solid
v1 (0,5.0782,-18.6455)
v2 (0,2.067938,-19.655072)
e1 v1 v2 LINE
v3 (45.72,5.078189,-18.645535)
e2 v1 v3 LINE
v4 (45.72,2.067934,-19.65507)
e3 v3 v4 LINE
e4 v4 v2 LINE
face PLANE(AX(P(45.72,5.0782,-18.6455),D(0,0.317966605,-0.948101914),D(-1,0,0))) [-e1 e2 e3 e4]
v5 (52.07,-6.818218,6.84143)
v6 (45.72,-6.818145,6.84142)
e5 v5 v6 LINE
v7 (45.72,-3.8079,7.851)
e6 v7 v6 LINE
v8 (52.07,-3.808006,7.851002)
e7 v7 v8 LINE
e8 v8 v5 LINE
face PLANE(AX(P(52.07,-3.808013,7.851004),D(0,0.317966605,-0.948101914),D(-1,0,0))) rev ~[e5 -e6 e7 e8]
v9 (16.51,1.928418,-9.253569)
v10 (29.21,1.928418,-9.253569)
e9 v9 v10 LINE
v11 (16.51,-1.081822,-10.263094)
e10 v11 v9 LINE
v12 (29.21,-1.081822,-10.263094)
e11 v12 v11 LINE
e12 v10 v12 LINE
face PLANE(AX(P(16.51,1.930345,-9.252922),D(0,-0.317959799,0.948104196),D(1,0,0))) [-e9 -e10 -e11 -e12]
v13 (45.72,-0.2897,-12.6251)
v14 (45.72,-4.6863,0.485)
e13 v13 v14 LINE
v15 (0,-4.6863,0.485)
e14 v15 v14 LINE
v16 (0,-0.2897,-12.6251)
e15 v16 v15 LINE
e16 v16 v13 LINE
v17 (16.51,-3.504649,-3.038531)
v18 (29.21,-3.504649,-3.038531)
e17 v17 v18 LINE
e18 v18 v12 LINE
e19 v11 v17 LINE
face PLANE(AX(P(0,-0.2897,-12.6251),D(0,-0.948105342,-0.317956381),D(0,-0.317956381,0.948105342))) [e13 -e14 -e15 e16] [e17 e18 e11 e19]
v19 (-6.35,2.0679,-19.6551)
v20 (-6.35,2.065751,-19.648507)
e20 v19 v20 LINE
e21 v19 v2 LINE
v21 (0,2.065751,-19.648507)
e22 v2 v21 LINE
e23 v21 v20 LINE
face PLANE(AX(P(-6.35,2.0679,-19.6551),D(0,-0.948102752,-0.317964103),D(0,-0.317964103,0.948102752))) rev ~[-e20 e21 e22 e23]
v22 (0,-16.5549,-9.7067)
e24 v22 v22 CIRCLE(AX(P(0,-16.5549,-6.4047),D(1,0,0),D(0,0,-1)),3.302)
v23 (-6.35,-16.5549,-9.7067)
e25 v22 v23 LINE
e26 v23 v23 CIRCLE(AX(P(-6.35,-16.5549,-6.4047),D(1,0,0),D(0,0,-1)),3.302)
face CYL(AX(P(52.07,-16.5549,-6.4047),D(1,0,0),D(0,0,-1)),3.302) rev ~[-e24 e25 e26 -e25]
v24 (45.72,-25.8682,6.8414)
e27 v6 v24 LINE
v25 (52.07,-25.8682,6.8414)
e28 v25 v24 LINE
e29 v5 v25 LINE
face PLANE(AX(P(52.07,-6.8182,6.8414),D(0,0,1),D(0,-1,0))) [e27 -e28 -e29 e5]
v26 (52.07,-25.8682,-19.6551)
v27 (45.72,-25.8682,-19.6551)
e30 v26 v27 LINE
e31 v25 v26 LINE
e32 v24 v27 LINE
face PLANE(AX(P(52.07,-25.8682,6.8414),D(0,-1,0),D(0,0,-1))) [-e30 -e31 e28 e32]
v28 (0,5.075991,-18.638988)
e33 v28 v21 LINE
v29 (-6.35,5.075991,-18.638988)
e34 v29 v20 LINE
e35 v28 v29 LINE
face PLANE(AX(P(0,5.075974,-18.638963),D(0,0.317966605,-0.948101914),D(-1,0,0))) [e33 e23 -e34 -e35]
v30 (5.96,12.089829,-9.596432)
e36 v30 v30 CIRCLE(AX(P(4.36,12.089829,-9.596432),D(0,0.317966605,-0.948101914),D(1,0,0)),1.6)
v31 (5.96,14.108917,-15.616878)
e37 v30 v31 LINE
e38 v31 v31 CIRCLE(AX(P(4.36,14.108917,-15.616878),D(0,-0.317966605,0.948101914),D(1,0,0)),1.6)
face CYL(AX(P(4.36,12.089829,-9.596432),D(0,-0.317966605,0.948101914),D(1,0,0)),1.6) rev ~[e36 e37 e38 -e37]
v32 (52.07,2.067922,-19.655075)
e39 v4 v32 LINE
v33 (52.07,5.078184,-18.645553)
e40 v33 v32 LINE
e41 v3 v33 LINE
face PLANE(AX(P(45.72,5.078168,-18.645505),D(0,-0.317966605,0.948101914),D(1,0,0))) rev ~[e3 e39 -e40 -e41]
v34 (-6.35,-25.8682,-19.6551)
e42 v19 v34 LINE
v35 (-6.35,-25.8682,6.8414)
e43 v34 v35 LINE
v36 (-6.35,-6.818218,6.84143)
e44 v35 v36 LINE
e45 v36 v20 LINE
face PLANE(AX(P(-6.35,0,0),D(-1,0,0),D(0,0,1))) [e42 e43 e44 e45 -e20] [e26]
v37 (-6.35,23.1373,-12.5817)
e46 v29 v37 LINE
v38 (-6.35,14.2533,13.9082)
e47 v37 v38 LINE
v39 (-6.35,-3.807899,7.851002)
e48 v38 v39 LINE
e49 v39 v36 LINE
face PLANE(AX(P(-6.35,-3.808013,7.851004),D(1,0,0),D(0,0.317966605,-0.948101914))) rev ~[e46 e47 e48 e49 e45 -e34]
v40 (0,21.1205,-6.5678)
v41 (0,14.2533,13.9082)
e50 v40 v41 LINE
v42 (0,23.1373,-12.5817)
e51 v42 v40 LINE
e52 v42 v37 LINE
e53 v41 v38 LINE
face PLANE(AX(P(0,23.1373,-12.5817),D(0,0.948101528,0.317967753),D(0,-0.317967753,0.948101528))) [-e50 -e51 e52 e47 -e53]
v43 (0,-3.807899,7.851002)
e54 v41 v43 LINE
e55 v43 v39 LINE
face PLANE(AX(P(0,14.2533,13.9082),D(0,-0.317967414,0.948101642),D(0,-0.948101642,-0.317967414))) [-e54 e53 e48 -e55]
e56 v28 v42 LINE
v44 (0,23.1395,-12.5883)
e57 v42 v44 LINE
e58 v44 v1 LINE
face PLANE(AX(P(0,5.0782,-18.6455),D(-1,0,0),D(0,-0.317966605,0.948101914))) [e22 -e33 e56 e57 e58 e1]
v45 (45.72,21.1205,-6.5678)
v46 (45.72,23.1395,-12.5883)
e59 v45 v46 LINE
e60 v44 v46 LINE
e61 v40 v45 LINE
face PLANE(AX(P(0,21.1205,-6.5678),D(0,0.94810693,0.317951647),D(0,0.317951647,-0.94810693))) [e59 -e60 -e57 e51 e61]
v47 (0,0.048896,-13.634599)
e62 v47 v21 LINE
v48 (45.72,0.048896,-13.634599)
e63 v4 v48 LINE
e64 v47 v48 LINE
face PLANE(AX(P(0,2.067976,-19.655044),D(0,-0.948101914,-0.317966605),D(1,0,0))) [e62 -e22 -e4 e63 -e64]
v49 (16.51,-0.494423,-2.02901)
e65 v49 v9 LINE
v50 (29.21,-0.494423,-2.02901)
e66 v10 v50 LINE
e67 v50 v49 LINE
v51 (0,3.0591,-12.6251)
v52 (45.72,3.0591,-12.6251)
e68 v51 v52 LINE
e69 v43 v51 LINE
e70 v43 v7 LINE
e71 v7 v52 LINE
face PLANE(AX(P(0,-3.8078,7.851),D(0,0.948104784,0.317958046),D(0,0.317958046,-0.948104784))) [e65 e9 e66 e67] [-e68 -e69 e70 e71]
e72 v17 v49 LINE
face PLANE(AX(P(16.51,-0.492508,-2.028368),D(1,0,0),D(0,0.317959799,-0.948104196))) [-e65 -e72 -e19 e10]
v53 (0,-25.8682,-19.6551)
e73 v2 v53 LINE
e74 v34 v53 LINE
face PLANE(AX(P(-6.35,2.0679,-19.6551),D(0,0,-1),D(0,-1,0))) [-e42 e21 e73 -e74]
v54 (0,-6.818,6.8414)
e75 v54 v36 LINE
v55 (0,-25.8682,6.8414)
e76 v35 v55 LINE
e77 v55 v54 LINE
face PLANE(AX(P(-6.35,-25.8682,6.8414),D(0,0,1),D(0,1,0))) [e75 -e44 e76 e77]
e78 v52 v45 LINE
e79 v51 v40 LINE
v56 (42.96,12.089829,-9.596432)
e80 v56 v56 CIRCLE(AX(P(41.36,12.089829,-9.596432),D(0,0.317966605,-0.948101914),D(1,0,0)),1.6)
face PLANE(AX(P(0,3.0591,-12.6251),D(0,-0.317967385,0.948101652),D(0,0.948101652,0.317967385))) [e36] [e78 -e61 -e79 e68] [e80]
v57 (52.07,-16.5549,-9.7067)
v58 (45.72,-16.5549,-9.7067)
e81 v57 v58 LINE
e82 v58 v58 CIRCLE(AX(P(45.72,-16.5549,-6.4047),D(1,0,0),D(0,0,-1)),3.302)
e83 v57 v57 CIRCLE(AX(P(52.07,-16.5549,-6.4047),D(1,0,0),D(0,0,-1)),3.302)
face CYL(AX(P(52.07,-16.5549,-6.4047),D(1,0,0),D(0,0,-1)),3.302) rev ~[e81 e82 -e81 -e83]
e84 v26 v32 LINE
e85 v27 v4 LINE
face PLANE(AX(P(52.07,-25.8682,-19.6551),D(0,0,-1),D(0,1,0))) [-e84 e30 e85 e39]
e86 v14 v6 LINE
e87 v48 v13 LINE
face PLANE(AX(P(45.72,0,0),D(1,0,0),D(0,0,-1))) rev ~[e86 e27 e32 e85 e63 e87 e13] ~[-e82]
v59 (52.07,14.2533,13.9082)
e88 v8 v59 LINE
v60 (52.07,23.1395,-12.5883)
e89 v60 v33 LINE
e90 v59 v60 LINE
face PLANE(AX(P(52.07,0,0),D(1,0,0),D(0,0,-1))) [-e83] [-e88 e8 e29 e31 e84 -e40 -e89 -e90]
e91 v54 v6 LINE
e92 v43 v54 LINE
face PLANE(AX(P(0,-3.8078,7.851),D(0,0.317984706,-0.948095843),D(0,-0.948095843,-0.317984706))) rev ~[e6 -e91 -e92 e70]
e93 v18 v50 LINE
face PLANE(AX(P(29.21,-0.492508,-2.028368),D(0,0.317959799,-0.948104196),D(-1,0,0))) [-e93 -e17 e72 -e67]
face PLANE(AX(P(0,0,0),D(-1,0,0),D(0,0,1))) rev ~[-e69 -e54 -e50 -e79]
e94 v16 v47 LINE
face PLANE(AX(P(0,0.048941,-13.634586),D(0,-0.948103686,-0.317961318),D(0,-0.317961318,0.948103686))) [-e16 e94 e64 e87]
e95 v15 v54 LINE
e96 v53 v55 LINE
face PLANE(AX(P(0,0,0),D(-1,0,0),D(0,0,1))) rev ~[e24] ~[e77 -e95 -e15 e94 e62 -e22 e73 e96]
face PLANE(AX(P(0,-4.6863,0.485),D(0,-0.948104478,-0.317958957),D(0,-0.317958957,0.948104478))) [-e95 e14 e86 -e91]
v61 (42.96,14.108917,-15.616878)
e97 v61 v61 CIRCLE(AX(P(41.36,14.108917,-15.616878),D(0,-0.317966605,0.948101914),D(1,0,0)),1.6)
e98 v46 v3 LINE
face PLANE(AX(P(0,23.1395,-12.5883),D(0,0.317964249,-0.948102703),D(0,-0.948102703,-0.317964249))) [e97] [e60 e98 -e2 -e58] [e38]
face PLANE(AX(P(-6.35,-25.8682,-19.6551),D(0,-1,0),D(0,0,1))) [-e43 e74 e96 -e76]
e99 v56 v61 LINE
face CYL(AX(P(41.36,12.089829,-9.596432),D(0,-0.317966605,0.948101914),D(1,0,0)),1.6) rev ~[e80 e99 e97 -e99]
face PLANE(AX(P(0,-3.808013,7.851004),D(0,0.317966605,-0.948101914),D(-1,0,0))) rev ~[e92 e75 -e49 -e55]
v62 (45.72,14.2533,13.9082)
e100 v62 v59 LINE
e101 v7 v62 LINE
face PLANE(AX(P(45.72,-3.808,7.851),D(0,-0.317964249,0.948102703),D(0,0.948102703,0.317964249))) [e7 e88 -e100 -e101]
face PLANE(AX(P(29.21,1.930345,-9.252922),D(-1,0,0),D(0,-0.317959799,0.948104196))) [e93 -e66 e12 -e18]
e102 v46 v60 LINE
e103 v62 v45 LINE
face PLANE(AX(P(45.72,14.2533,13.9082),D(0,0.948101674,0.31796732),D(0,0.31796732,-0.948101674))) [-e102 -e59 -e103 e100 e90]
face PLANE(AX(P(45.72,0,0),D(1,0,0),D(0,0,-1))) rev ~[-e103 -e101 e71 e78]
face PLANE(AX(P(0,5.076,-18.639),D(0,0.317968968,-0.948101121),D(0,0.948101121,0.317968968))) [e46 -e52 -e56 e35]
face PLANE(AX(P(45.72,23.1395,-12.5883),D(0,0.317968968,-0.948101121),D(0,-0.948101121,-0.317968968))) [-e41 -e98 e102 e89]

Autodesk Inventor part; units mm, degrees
ref_plane "YZ Plane" through (0, 0, 0) normal (1, 0, 0) x (0, 1, 0)
ref_plane "XZ Plane" through (0, 0, 0) normal (0, 1, 0) x (-1, 0, 0)
sketch "Sketch8" plane through (0, 0, 0) normal (1, 0, 0) x (0, 1, 0)
  line L0 (-3.8078, 7.851) -> (3.0591, -12.6251)
  line L1 (-0.2897, -12.6251) -> (-4.6863, 0.485)
  line L2 (3.0591, -12.6251) -> (-0.2897, -12.6251)
  line L3 (-4.6863, 0.485) -> (-6.818, 6.8414)
  line L4 (-3.8078, 7.851) -> (-6.818, 6.8414)
  point P0 (0, 0)
  dimension "d149" = 21.5968
  dimension "d150" = 3.175
  dimension "d151" = 3.3488
extrude "Extrusion6" add sketch "Sketch8" along normal blind 45.72
sketch "Sketch11" plane through (0, 0, 0) normal (-1, 0, 0) x (0, 0, 1)
  line L0 (0.485, -4.6863) -> (-12.6251, -0.2897) projected
  line L1 (6.8422, -6.8159) -> (6.835, -6.8159)
  line L2 (-12.6251, -0.2897) -> (0.485, -4.6863)
  line L3 (7.851, -3.8078) -> (-12.6251, 3.0591) projected
  line L4 (13.9082, 14.2533) -> (7.851, -3.808)
  line L5 (7.851, -3.808) -> (-18.639, 5.076)
  line L6 (-18.639, 5.076) -> (-12.5817, 23.1373)
  line L7 (-12.5817, 23.1373) -> (13.9082, 14.2533)
  line L8 (-12.6251, -0.2897) -> (6.8414, -6.818) projected
  line L9 (6.8414, -6.818) -> (7.851, -3.8078) projected
  point P0 (0, 0)
  dimension "d73" = 27.94
  dimension "d76" = 0
  dimension "d88" = 19.05
extrude "Extrusion8" add sketch "Sketch11" along normal blind 6.35 contours L3 L5 L6 L7 L4
sketch "Sketch13" plane through (0, -3.8078, 7.851) normal (0, 0.9481042, 0.3179598) x (1, 0, 0)
  line L0 (0, 0) -> (0, 21.5968) projected
  line L1 (16.51, 18.0408) -> (29.21, 18.0408)
  line L2 (29.21, 18.0408) -> (29.21, 10.4208)
  line L3 (29.21, 10.4208) -> (16.51, 10.4208)
  line L4 (16.51, 10.4208) -> (16.51, 18.0408)
  point P0 (0, 8.6543)
  dimension "d55" = 7.62
  dimension "d56" = 12.7
  dimension "d57" = 16.51
extrude "Extrusion10" cut sketch "Sketch13" against normal blind 25.4
sketch "Sketch15" plane through (0, 0, 0) normal (1, 0, 0) x (0, 0, -1)
  line L0 (6.5678, 21.1205) -> (12.5883, 23.1395)
  line L1 (12.5883, 23.1395) -> (18.6455, 5.0782)
  line L2 (18.6455, 5.0782) -> (12.6251, 3.0591)
  line L3 (12.6251, 3.0591) -> (6.5678, 21.1205)
  dimension "d67" = 6.35
  dimension "d69" = 0
  dimension "d70" = 0
  dimension "d87" = 19.05
extrude "Extrusion11" add sketch "Sketch15" along normal blind 45.72
sketch "Sketch17" plane through (45.72, 0, 0) normal (1, 0, 0) x (0, 0, -1)
  line L0 (-7.851, -3.808) -> (-13.9082, 14.2533) projected
  line L1 (-7.851, -3.808) -> (-13.9082, 14.2533)
  line L2 (-13.9082, 14.2533) -> (12.5883, 23.1395)
  line L3 (12.5883, 23.1395) -> (18.6456, 5.0782)
  line L4 (18.6456, 5.0782) -> (-7.851, -3.808)
  point P0 (0, 0)
extrude "Extrusion12" add sketch "Sketch17" along normal blind 6.35
sketch "Sketch19" plane through (45.72, 5.0782, -18.6456) normal (0, -0.9481019, -0.3179666) x (1, 0, 0)
  line L0 (0, 6.3501) -> (0, 0.0001) projected
  line L1 (6.35, 27.947) -> (0, 27.947)
  line L2 (0, 27.947) -> (0, 0.0001)
  line L3 (0, 0.0001) -> (6.35, 0.0001)
  line L4 (6.35, 0.0001) -> (6.35, 27.947)
  line L5 (-45.72, 6.3501) -> (0, 6.3501) projected
  line L6 (0, 0.0001) -> (0, 0.0001)
  line L7 (0, 0.0001) -> (0, 6.3501)
  line L8 (0, 6.3501) -> (0, 6.3501)
  line L9 (0, 6.3501) -> (0, 0.0001)
  line L10 (-45.72, 0.007) -> (-52.07, 0.007) projected
  line L11 (-52.07, 0.007) -> (-45.72, 0.007)
  line L12 (-45.72, 0.007) -> (-45.72, 27.947)
  line L13 (-45.72, 27.947) -> (-52.07, 27.947)
  line L14 (-52.07, 27.947) -> (-52.07, 0.007)
  point P0 (-45.72, 19.2926)
extrude "Extrusion13" add sketch "Sketch19" along normal blind 3.175
sketch "Sketch20" plane through (0, 5.0782, -18.6455) normal (0, -0.9481019, -0.3179666) x (1, 0, 0)
  line L0 (45.72, 0) -> (0, 0)
  line L1 (0, 0) -> (0, 6.35)
  line L2 (0, 6.35) -> (45.72, 6.35)
  line L3 (45.72, 6.35) -> (45.72, 0)
  point P0 (0, 19.2926)
extrude "Extrusion14" add sketch "Sketch20" along normal blind 3.175
sketch "Sketch21" plane through (0, 0, 0) normal (1, 0, 0) x (0, 0, -1)
  line L0 (19.6485, 2.0658) -> (13.6346, 0.0489) projected
  line L1 (13.6346, 0.0489) -> (12.6251, 3.0591) projected
  line L2 (12.6251, 3.0591) -> (12.6251, -0.2897) projected
  line L3 (12.6251, -0.2897) -> (-6.8414, -6.818) projected
  line L4 (-0.485, -4.6863) -> (-0.485, -4.6865) projected
  line L5 (19.6485, 2.0657) -> (-6.8414, -6.8182) projected
  line L6 (19.6485, 2.0657) -> (19.6485, 2.0658) projected
  line L7 (12.6251, 3.0591) -> (13.6346, 0.0489)
  line L8 (12.6251, -0.2897) -> (13.6346, 0.0489)
  line L9 (12.6251, 3.0591) -> (12.6251, -0.2897)
  point P0 (0, 0)
  point P1 (-6.8415, -6.8181)
extrude "Extrusion15" add sketch "Sketch21" along normal blind 45.72
sketch "Sketch22" plane through (16.51, -1.0818, -10.2631) normal (0, 0.9481042, 0.3179598) x (1, 0, 0)
  line L0 (12.7, -7.62) -> (12.7, 0) projected
  line L1 (12.7, 0) -> (0, 0) projected
  line L2 (0, 0) -> (12.7, 0)
  line L3 (12.7, 0) -> (12.7, -7.62)
  line L4 (12.7, -7.62) -> (0, -7.62)
  line L5 (0, -7.62) -> (0, 0)
  point P0 (-16.51, -9.3866)
extrude "Extrusion16" cut sketch "Sketch22" against normal blind 45.72
ref_plane "Work Plane1" through (0, -6.818, 6.8414) normal (0, -1, 0) x (1, 0, 0)
sketch "Sketch31" plane through (0, 21.1205, -6.5678) normal (0, -0.3179666, 0.9481019) x (1, 0, 0)
  line L0 (0, -19.05) -> (45.72, -19.05) projected
  line L1 (8.11, -16.025) -> (37.61, -16.025)
  line L2 (37.61, -16.025) -> (37.61, -13.275)
  line L3 (37.61, -13.275) -> (41.36, -13.275)
  arc A0 (41.36, -13.275) -> (41.36, -5.775) centre (41.36, -9.525) ccw
  line L4 (41.36, -5.775) -> (37.61, -5.775)
  line L5 (37.61, -5.775) -> (37.61, -3.025)
  line L6 (37.61, -3.025) -> (8.11, -3.025)
  line L7 (8.11, -3.025) -> (8.11, -5.775)
  line L8 (8.11, -5.775) -> (4.36, -5.775)
  arc A1 (4.36, -5.775) -> (4.36, -13.275) centre (4.36, -9.525) ccw
  line L9 (4.36, -13.275) -> (8.11, -13.275)
  line L10 (8.11, -13.275) -> (8.11, -16.025)
  circle A2 centre (41.36, -9.525) radius 1.6
  circle A3 centre (4.36, -9.525) radius 1.6
  line L11 (22.86, -3.025) -> (22.86, -16.025)
  line L12 (0, 0) -> (45.72, 0) projected
  line L13 (22.86, 0) -> (22.86, -19.05)
  line L14 (4.36, -9.525) -> (41.36, -9.525)
  line L15 (0, -22.225) -> (0, 0) projected
  line L16 (45.72, -19.05) -> (45.72, 0) projected
  line L17 (0, -9.525) -> (45.72, -9.525)
  point P0 (0, -17.936)
  point P1 (22.86, -9.525)
  point P2 (22.86, -9.525)
  dimension "d132" = 9.525
extrude "Extrusion24" cut sketch "Sketch31" against normal through all contours L17 L14 A3 | A3 L14 L17 | L14 L17 A2 | A2 L17 L14
sketch "Sketch32" plane through (52.07, 0, 0) normal (1, 0, 0) x (0, 0, -1)
  line L0 (19.6551, 2.0679) -> (-6.8414, -6.8182) projected
  line L1 (-6.8414, -6.8182) -> (-6.8414, -25.8682)
  line L2 (-6.8414, -25.8682) -> (19.6551, -25.8682)
  line L3 (19.6551, -25.8682) -> (19.6551, 2.0679)
  point P0 (0, 0)
  dimension "d139" = 19.05
extrude "Extrusion25" add sketch "Sketch32" against normal up to surface (6.35 mm away)
sketch "Sketch33" plane through (-6.35, 0, 0) normal (-1, 0, 0) x (0, 0, 1)
  line L0 (6.8414, -25.8682) -> (6.8414, -6.8182) projected
  line L1 (-19.6551, -25.8682) -> (6.8414, -25.8682) projected
  line L2 (-19.6551, 2.0679) -> (-19.6551, -25.8682) projected
  line L3 (13.9082, 14.2533) -> (6.8414, -6.8182) projected
  line L4 (-19.6551, 2.0679) -> (6.8414, -6.8182)
  point P0 (0, 0)
extrude "Extrusion26" add sketch "Sketch33" against normal up to surface (6.35 mm away)
sketch "Sketch34" plane through (52.07, 0, 0) normal (1, 0, 0) x (0, 0, -1)
  line L0 (-6.8414, -25.8682) -> (-6.8414, -6.8182) projected
  line L1 (19.6551, -25.8682) -> (-6.8414, -25.8682) projected
  circle A0 centre (6.4047, -16.5549) radius 3.302
  point P0 (0, 0)
  dimension "d144" = 6.604
  dimension "d145" = 9.3133
  dimension "d146" = 13.2461
extrude "Extrusion27" cut sketch "Sketch34" against normal up to surface (58.42 mm away)
equation "\"d57\" = d58"
equation "\"d58\" = 16.51"
properties part number "Lidar Sensor Case v3"
